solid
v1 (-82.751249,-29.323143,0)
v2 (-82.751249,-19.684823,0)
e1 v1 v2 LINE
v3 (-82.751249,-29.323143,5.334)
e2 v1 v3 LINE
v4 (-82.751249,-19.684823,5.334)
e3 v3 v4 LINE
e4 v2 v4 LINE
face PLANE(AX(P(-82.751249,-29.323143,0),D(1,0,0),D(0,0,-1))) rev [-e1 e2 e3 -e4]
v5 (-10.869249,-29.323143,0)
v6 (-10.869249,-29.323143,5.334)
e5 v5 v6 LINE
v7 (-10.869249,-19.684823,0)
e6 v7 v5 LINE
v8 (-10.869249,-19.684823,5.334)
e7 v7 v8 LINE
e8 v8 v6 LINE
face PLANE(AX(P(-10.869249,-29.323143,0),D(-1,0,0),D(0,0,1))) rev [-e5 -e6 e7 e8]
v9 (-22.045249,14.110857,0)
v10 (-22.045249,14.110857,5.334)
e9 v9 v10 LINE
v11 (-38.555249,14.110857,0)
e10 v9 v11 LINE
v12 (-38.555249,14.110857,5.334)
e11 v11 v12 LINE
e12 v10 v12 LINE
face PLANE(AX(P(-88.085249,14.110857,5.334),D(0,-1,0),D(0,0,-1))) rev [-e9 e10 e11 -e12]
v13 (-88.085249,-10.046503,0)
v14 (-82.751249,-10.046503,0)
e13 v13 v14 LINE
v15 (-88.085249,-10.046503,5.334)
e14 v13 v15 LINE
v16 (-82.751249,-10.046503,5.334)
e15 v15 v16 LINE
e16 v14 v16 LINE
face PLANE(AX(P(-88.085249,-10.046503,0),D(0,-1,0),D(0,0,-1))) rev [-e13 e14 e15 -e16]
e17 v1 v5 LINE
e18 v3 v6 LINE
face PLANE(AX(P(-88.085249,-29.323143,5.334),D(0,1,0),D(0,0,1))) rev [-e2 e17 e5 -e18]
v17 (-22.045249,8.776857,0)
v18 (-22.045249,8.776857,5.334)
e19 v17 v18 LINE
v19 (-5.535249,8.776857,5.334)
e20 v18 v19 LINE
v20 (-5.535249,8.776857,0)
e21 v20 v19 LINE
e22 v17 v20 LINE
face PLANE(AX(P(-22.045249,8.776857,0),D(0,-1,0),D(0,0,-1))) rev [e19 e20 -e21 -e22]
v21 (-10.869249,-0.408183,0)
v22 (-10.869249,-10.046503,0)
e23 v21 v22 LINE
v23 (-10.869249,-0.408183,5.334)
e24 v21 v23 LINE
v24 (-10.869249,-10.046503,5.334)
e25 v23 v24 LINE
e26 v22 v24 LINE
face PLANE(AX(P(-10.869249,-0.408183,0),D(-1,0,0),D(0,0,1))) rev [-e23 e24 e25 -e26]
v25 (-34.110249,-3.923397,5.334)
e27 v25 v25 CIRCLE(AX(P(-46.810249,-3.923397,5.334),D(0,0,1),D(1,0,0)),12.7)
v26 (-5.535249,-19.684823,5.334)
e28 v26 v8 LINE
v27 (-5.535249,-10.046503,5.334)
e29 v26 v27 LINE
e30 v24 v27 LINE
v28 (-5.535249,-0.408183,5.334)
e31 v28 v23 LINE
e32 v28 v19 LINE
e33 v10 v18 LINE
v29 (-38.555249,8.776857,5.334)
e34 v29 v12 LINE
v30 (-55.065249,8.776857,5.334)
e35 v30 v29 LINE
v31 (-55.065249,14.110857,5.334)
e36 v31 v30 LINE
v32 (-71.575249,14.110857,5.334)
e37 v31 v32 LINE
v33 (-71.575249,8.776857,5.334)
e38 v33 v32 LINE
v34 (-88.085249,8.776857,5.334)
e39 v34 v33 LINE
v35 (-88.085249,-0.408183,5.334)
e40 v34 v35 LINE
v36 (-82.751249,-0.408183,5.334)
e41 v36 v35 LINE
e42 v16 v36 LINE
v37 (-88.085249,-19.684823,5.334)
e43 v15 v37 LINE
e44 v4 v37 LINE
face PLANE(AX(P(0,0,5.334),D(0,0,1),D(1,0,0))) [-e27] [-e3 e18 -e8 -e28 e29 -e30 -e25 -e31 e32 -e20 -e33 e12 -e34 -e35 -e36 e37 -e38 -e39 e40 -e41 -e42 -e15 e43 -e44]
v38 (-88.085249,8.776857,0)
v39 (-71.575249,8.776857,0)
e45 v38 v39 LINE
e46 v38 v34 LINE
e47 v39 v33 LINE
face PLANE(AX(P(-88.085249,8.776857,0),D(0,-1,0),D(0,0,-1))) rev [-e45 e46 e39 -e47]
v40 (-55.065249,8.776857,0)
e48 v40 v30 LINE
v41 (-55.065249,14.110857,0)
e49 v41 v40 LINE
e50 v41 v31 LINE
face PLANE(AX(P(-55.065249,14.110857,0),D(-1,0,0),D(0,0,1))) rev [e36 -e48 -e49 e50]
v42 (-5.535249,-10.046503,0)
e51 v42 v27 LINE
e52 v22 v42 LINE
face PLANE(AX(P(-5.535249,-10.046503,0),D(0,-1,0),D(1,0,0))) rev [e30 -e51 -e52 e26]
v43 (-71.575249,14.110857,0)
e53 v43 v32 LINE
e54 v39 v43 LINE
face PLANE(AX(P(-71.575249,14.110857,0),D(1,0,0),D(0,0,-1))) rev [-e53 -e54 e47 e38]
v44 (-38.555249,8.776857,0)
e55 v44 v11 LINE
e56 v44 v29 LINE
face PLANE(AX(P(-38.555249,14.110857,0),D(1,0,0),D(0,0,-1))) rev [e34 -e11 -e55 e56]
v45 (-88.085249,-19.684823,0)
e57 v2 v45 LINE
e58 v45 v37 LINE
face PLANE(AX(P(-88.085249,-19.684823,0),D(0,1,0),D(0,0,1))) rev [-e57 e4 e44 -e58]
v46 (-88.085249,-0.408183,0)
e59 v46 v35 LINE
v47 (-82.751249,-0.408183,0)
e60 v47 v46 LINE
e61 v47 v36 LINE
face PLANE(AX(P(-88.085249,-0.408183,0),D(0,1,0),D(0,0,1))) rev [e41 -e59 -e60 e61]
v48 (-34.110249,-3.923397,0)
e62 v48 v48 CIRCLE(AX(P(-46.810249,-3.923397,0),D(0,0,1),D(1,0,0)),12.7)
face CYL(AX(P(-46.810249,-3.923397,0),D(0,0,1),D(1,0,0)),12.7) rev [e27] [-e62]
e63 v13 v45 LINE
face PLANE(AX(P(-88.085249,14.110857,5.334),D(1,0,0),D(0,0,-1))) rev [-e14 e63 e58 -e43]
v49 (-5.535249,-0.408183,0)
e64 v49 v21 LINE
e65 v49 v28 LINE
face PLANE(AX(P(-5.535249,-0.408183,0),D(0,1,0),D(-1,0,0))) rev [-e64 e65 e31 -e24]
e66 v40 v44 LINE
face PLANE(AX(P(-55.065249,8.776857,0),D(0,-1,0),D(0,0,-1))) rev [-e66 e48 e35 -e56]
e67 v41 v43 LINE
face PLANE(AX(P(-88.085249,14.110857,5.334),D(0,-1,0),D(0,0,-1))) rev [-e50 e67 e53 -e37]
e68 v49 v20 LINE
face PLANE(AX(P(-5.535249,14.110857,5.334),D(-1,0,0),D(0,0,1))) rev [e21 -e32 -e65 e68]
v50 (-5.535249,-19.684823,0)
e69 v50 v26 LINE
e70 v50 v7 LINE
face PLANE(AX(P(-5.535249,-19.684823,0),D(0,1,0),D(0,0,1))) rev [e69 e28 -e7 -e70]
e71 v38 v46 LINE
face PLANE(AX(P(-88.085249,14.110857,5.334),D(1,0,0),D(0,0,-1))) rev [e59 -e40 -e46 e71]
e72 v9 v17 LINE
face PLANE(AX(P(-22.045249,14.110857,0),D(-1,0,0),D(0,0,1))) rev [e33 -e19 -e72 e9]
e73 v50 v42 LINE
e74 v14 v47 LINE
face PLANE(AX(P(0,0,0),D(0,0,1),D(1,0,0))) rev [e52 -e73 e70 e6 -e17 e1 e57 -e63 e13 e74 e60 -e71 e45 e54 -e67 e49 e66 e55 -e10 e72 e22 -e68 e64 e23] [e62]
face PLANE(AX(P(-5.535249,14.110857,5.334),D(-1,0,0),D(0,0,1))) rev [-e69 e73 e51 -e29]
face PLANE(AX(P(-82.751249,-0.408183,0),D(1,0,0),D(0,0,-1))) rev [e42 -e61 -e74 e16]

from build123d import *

# Parameters (mm, degrees)
SKETCH1_W                = 82.55
SKETCH1_H                = 43.434
BOSS_EXTRUDE1_DEPTH      = 5.334
CUT_EXTRUDE1_START       = -88.085249325
CUT_EXTRUDE1_OUTLINE_W   = 5.334
CUT_EXTRUDE1_OUTLINE_H   = 5.334
CUT_EXTRUDE1_DEPTH       = 16.51
CUT_EXTRUDE1_START_2     = -55.065249325
CUT_EXTRUDE1_2_OUTLINE_W = 5.334
CUT_EXTRUDE1_2_OUTLINE_H = 5.334
CUT_EXTRUDE1_2_DEPTH     = 16.51
CUT_EXTRUDE1_START_3     = -22.045249325
CUT_EXTRUDE1_3_OUTLINE_W = 5.334
CUT_EXTRUDE1_3_OUTLINE_H = 5.334
CUT_EXTRUDE1_3_DEPTH     = 16.51
SKETCH3_W                = 5.334
SKETCH3_H                = 9.638319844
SKETCH3_H_2              = 9.638319843
CUT_EXTRUDE2_DEPTH       = 93.990910348
SKETCH4_R                = 12.7
CUT_EXTRUDE3_DEPTH       = 93.990910348


# Read off the part's stored shape, not the designer's step: Cut-Extrude1
with BuildPart() as part:
    # Sketch1 → Boss-Extrude1 (new body)
    with BuildSketch(Plane.XY):
        with Locations((-46.810249325, -7.606142782)):
            Rectangle(SKETCH1_W, SKETCH1_H)
    extrude(amount=BOSS_EXTRUDE1_DEPTH)

    # Cut-Extrude1 outline → Cut-Extrude1 (cut)
    with BuildSketch(Plane.YZ.offset(CUT_EXTRUDE1_START)):
        with Locations((11.443857218, 2.667)):
            Rectangle(CUT_EXTRUDE1_OUTLINE_W, CUT_EXTRUDE1_OUTLINE_H)
    extrude(amount=CUT_EXTRUDE1_DEPTH, mode=Mode.SUBTRACT)

    # Cut-Extrude1 2 outline → Cut-Extrude1 2 (cut)
    with BuildSketch(Plane.YZ.offset(CUT_EXTRUDE1_START_2)):
        with Locations((11.443857218, 2.667)):
            Rectangle(CUT_EXTRUDE1_2_OUTLINE_W, CUT_EXTRUDE1_2_OUTLINE_H)
    extrude(amount=CUT_EXTRUDE1_2_DEPTH, mode=Mode.SUBTRACT)

    # Cut-Extrude1 3 outline → Cut-Extrude1 3 (cut)
    with BuildSketch(Plane.YZ.offset(CUT_EXTRUDE1_START_3)):
        with Locations((11.443857218, 2.667)):
            Rectangle(CUT_EXTRUDE1_3_OUTLINE_W, CUT_EXTRUDE1_3_OUTLINE_H)
    extrude(amount=CUT_EXTRUDE1_3_DEPTH, mode=Mode.SUBTRACT)

    # Sketch3 → Cut-Extrude2 (cut, through all)
    with BuildSketch(Plane.XY.offset(5.334)):
        with Locations((-85.418249325, -24.50398286)):
            Rectangle(SKETCH3_W, SKETCH3_H)
        with Locations((-85.418249325, -5.227343173)):
            Rectangle(SKETCH3_W, SKETCH3_H_2)
        with Locations((-8.202249325, -24.50398286)):
            Rectangle(SKETCH3_W, SKETCH3_H)
        with Locations((-8.202249325, -5.227343173)):
            Rectangle(SKETCH3_W, SKETCH3_H_2)
    extrude(amount=-CUT_EXTRUDE2_DEPTH, mode=Mode.SUBTRACT)

    # Sketch4 → Cut-Extrude3 (cut, through all)
    with BuildSketch(Plane.XY.offset(5.334)):
        with Locations((-46.810249325, -3.923396782)):
            Circle(SKETCH4_R)
    extrude(amount=-CUT_EXTRUDE3_DEPTH, mode=Mode.SUBTRACT)


solid = part.part
